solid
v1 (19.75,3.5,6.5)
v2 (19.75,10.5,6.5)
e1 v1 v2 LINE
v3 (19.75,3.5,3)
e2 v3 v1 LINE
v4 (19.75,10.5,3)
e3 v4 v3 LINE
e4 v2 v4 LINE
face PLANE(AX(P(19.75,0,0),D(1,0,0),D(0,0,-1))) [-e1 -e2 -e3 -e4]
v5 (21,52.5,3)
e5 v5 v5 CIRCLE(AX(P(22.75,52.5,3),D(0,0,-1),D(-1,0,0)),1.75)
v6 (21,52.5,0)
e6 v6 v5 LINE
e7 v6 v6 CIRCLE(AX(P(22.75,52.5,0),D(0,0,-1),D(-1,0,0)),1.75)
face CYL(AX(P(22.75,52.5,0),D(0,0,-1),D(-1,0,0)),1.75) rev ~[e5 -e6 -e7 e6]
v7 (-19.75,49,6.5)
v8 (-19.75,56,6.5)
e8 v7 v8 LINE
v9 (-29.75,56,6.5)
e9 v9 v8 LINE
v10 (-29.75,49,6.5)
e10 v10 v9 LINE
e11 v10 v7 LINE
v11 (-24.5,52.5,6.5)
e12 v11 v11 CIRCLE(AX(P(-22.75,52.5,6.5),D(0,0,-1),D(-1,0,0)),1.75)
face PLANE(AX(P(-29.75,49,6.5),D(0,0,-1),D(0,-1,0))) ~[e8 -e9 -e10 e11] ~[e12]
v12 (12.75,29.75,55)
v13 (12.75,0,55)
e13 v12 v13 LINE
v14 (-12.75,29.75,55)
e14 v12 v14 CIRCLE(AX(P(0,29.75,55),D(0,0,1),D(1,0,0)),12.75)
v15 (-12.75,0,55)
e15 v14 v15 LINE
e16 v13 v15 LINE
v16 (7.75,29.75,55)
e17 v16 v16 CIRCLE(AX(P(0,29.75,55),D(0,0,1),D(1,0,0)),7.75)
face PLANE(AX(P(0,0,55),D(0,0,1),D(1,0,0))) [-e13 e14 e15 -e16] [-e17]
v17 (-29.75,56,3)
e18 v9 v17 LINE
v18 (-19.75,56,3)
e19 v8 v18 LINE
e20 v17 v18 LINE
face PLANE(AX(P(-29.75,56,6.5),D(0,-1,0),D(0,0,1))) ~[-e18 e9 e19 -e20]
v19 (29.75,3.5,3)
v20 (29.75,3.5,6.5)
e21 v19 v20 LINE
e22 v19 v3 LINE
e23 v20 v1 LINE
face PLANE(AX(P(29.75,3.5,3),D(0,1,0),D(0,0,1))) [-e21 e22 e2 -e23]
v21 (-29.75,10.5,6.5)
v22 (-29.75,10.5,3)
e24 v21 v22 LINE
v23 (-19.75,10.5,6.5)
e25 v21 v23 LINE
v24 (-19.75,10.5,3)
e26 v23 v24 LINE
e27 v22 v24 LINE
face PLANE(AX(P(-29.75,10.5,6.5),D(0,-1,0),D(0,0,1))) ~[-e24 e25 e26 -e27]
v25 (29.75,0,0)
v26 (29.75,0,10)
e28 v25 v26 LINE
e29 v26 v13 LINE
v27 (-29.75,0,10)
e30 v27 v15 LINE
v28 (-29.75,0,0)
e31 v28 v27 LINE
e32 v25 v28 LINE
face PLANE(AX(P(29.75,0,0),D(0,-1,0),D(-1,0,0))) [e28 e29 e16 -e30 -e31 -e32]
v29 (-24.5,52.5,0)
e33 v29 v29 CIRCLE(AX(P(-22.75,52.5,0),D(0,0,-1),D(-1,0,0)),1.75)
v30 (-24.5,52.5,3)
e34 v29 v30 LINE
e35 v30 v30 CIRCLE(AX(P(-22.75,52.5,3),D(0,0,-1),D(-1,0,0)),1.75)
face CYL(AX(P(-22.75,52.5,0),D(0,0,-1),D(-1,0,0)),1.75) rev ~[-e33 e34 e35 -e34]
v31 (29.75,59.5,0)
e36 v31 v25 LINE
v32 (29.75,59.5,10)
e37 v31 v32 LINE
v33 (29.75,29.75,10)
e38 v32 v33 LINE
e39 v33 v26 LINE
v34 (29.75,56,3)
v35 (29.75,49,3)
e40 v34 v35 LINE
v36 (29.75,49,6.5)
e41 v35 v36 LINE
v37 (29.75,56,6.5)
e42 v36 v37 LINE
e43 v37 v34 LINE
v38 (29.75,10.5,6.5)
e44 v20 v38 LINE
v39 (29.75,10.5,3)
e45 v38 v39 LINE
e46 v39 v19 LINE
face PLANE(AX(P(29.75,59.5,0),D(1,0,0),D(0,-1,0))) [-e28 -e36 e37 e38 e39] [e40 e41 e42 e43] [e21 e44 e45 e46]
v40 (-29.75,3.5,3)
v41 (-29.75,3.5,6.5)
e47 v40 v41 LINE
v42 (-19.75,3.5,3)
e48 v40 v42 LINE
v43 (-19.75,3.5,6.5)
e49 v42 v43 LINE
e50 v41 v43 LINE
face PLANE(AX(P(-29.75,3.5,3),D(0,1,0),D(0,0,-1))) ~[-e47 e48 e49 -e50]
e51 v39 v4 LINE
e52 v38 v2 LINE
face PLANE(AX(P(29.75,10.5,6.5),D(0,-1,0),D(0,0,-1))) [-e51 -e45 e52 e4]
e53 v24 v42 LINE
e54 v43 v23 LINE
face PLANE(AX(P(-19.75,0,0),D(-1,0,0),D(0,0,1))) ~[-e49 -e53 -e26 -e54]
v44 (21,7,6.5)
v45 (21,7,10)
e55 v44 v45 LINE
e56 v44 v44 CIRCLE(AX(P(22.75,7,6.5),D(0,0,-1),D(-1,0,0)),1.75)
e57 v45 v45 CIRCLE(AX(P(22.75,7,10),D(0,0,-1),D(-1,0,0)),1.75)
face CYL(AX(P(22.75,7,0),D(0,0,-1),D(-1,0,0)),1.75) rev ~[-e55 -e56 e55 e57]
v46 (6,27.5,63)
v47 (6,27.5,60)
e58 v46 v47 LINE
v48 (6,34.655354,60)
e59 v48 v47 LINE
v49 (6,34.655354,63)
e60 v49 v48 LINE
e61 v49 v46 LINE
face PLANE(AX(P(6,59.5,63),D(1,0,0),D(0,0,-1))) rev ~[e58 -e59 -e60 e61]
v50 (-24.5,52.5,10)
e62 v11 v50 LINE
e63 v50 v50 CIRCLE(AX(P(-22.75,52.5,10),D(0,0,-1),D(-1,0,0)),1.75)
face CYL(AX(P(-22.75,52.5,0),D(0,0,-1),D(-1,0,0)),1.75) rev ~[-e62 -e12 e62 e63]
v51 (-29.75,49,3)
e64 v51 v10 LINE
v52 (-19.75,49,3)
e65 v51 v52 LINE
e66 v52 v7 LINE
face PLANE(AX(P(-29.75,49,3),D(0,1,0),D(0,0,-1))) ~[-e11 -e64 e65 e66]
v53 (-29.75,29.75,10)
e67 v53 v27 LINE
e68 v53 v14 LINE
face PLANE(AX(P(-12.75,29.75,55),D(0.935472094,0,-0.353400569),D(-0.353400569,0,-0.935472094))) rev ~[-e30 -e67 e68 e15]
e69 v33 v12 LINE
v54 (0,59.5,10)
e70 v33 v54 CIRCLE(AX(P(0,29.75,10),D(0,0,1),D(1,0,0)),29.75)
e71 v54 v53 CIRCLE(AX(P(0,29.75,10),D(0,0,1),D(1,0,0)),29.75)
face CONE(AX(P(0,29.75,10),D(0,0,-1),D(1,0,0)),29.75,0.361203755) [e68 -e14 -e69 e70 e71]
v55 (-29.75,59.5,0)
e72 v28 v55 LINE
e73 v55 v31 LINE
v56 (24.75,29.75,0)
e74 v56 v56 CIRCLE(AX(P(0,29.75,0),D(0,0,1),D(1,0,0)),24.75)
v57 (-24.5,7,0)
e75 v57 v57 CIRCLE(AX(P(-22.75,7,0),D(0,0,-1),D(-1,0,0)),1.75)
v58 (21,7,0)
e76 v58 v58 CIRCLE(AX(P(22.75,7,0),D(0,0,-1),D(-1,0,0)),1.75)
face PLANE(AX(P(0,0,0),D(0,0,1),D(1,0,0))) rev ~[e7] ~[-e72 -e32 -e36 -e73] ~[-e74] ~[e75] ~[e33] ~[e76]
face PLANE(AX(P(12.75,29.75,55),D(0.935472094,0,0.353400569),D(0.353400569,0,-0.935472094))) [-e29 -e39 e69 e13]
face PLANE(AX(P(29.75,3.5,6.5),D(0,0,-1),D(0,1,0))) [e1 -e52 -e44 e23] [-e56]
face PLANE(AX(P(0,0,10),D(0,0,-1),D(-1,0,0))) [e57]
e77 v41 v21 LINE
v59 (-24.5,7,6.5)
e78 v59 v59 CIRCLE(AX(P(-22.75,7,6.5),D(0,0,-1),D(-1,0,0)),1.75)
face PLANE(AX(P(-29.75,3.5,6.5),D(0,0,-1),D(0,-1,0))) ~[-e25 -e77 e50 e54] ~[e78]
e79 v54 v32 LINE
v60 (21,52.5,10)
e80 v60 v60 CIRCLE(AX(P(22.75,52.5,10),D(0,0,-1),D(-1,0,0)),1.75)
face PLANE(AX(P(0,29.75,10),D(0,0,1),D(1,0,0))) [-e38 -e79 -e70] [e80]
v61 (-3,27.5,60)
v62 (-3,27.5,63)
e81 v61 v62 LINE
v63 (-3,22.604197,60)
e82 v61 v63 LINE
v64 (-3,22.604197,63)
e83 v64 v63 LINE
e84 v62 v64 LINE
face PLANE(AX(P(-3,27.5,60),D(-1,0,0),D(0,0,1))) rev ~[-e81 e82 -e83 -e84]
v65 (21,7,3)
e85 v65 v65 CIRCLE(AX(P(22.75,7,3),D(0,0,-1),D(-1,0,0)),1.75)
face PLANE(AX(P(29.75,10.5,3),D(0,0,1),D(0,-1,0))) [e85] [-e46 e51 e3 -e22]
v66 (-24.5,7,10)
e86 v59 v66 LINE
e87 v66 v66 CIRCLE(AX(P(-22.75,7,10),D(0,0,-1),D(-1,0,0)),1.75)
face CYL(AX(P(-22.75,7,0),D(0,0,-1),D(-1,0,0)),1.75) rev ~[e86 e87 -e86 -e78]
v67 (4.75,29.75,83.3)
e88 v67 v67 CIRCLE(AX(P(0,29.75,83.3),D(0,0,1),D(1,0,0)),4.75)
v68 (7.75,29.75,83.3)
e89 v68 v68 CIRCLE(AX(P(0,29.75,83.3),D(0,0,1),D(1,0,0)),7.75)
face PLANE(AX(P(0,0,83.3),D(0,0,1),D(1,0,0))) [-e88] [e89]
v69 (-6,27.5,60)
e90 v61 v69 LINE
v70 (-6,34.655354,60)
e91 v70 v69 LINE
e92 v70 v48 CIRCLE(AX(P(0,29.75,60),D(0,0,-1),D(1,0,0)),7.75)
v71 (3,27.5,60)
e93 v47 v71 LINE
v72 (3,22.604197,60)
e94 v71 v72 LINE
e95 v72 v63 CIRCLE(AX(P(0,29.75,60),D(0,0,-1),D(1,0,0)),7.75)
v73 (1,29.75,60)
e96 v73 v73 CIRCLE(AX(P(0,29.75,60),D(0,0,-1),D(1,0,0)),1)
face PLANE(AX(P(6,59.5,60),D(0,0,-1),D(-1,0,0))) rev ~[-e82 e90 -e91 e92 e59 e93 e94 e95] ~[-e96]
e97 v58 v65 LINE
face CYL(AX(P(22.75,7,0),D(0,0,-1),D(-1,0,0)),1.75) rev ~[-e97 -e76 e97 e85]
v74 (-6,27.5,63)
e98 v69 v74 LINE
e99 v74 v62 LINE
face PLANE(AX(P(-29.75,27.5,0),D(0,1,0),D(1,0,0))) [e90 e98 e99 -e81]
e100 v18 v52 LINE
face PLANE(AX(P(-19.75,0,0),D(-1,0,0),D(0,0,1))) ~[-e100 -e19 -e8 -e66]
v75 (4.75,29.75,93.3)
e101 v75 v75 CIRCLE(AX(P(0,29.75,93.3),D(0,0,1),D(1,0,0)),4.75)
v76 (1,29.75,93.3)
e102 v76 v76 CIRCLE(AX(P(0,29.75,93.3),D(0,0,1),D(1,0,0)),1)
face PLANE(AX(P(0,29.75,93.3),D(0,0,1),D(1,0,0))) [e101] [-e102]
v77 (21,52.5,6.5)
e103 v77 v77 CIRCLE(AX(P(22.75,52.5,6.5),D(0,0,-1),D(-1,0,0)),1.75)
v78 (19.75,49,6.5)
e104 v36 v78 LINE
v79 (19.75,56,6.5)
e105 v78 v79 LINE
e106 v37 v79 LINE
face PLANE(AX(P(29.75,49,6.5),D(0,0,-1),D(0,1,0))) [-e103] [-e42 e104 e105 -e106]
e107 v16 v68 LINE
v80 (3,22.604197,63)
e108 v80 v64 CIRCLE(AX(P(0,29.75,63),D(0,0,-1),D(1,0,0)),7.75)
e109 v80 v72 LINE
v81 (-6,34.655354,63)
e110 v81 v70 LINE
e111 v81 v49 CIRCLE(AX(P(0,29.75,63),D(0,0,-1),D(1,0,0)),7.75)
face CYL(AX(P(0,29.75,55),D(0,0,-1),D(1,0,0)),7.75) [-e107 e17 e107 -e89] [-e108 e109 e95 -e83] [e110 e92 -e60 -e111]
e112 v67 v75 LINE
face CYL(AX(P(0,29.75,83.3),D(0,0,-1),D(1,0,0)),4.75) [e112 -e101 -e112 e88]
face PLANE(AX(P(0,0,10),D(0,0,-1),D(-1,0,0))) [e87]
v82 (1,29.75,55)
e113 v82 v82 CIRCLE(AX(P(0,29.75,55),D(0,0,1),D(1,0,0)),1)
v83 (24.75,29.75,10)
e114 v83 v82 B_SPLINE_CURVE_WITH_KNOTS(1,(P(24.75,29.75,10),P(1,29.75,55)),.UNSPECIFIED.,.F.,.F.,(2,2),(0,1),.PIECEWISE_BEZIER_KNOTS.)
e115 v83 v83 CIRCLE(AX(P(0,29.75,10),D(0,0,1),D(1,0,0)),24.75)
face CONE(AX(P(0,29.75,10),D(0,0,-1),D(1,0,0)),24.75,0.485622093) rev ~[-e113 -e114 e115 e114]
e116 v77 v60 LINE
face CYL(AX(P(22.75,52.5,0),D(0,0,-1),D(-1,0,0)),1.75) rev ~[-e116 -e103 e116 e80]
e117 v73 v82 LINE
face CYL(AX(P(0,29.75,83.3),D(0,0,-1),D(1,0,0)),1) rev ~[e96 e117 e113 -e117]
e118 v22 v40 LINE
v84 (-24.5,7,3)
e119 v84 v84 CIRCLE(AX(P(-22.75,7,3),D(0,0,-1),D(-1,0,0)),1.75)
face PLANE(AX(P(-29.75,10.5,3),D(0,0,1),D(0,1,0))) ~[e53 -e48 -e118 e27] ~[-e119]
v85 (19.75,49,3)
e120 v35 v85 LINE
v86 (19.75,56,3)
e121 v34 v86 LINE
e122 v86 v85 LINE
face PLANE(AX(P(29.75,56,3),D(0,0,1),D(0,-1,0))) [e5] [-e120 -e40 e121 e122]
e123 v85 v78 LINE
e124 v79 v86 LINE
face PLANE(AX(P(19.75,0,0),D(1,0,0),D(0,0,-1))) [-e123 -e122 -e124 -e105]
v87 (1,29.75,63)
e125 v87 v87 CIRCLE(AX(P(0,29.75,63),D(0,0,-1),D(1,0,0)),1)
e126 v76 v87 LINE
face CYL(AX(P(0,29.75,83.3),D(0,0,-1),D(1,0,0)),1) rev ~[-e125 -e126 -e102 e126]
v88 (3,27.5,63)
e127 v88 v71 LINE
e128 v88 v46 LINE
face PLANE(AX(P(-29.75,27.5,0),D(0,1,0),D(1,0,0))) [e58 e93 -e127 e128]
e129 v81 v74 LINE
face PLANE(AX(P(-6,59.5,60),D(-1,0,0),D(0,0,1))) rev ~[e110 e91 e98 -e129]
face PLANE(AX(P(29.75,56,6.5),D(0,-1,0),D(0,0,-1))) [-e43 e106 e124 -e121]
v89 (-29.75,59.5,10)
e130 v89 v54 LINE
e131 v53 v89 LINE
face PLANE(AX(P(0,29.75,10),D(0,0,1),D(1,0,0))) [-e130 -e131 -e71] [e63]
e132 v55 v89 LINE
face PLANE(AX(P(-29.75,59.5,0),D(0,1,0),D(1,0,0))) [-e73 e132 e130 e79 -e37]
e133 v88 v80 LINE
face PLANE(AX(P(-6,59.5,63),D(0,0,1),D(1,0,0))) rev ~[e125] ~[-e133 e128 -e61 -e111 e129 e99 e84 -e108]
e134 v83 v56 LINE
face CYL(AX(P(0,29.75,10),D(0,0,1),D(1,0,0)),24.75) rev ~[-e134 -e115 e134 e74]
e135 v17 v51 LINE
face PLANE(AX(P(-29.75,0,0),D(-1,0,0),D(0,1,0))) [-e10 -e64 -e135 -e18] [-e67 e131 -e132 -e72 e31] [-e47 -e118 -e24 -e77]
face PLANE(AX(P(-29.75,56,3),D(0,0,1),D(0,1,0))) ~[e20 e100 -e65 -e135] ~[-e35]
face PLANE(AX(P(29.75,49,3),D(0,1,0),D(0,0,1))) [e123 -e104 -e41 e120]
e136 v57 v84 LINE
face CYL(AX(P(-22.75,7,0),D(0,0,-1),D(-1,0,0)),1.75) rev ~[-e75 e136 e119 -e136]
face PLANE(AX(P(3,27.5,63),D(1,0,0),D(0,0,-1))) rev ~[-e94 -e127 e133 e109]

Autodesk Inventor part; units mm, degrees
ref_plane "YZ Plane" through (0, 0, 0) normal (1, 0, 0) x (0, 1, 0)
ref_plane "XZ Plane" through (0, 0, 0) normal (0, 1, 0) x (-1, 0, 0)
sketch "Sketch2" plane through (0, 0, 0) normal (0, 0, 1) x (1, 0, 0)
  line L0 (-29.75, 59.5) -> (29.75, 59.5)
  line L1 (29.75, 59.5) -> (29.75, 0)
  line L2 (29.75, 0) -> (-29.75, 0)
  line L3 (-29.75, 0) -> (-29.75, 59.5)
  point P0 (0, 0)
  point P1 (0, 0)
  dimension "d0" = 59.5
extrude "Extrusion1" add sketch "Sketch2" along normal blind 55
sketch "Sketch3" plane through (0, 0, 55) normal (0, 0, 1) x (1, 0, 0)
  circle A0 centre (0, 29.75) radius 1
  circle A1 centre (0, 29.75) radius 7.75
  line L0 (0, 0) -> (0, 59.5) construction
  line L1 (29.75, 59.5) -> (-29.75, 59.5) construction
  line L2 (29.75, 0) -> (29.75, 59.5) construction
  line L3 (29.75, 29.75) -> (-29.75, 29.75) construction
  line L4 (-29.75, 59.5) -> (-29.75, 0) construction
  line L5 (-29.75, 0) -> (29.75, 0) projected
  dimension "d3" = 15.5
  dimension "d5" = 2
  dimension "d47" = 22
extrude "Extrusion2" add sketch "Sketch3" along normal blind 28.3
sketch "Sketch4" plane through (0, 29.75, 83.3) normal (0, 0, 1) x (1, 0, 0)
  circle A0 centre (0, 0) radius 1
  circle A1 centre (0, 0) radius 4.75
  circle A2 centre (0, 0) radius 1 projected
  point P0 (0, -29.75)
  dimension "d8" = 9.5
extrude "Extrusion3" add sketch "Sketch4" along normal blind 10
sketch "Sketch10" plane through (0, 0, 0) normal (0, 0, -1) x (-1, 0, 0)
  circle A0 centre (-22.75, 52.5) radius 1.75
  circle A1 centre (-22.75, 7) radius 1.75
  circle A2 centre (22.75, 52.5) radius 1.75
  circle A3 centre (22.75, 7) radius 1.75
  line L0 (-29.75, 59.5) -> (-29.75, 0) projected
  line L1 (29.75, 59.5) -> (-29.75, 59.5) projected
  line L2 (-29.75, 29.75) -> (29.75, 29.75) construction
  line L3 (29.75, 0) -> (29.75, 59.5) construction
  line L4 (0, 59.5) -> (0, 0) construction
  dimension "d29" = 7
  dimension "d30" = 7
  dimension "d33" = 3.5
extrude "Extrusion5" cut sketch "Sketch10" against normal blind 10
sketch "Sketch9" plane through (29.75, 0, 0) normal (1, 0, 0) x (0, 0, -1)
  line L0 (-6.5, 56) -> (-3, 56)
  line L1 (-3, 56) -> (-3, 49)
  line L2 (-3, 49) -> (-6.5, 49)
  line L3 (-6.5, 49) -> (-6.5, 56)
  line L4 (-6.5, 10.5) -> (-3, 10.5)
  line L5 (-3, 10.5) -> (-3, 3.5)
  line L6 (-3, 3.5) -> (-6.5, 3.5)
  line L7 (-6.5, 3.5) -> (-6.5, 10.5)
  line L8 (0, 59.5) -> (-55, 59.5) projected
  line L9 (-55, 0) -> (-55, 59.5) construction
  line L10 (-55, 29.75) -> (0, 29.75) construction
  line L11 (0, 0) -> (0, 59.5) construction
  line L12 (0, 54.25) -> (0, 50.75) projected
  line L13 (0, 52.5) -> (-10, 52.5) construction
  line L14 (-10, 54.25) -> (-10, 50.75) projected
  dimension "d24" = 7
  dimension "d25" = 3.5
  dimension "d26" = 3
extrude "Extrusion4" cut sketch "Sketch9" against normal blind 10
mirror "Mirror1" about plane through (0, 0, 0) normal (1, 0, 0) of "Extrusion4"
ref_plane "Work Plane1" through (0, 0, 10) normal (0, 0, 1) x (1, 0, 0)
sketch "Sketch11" plane through (0, 0, 10) normal (0, 0, 1) x (1, 0, 0)
  circle A0 centre (0, 29.75) radius 24.75
  circle A1 centre (0, 29.75) radius 1 projected
  line L0 (-29.75, 59.5) -> (29.75, 59.5) projected
  point P0 (0, 0)
  dimension "d49" = 5
extrude "Extrusion6" cut sketch "Sketch11" against normal through all contours A0 | A1
loft "Loft2" cut section 1 edges at (-24.75, 29.75, 10) section 2 edges at (-1, 29.75, 55)
sketch "Sketch7" plane through (-29.75, 59.5, 0) normal (0, 1, 0) x (1, 0, 0)
  line L0 (35.75, -60) -> (23.75, -60)
  line L1 (23.75, -60) -> (23.75, -63)
  line L2 (23.75, -63) -> (35.75, -63)
  line L3 (35.75, -63) -> (35.75, -60)
  line L4 (29.75, -60) -> (29.75, -63) construction
  line L5 (26.5, -55) -> (28.5, -55) construction
  line L6 (29.75, -55) -> (29.75, -83.3) construction
  line L7 (59.5, -55) -> (0, -55) construction
  line L8 (22, -83.3) -> (37.5, -83.3) projected
  point P0 (29.75, 0)
  dimension "d16" = 3
  dimension "d17" = 12
  dimension "d18" = 5
extrude "Extrusion7" cut sketch "Sketch7" against normal blind 32
sketch "Sketch12" plane through (-29.75, 27.5, 0) normal (0, 1, 0) x (1, 0, 0)
  line L0 (32.75, -60) -> (26.75, -60)
  line L1 (26.75, -60) -> (26.75, -63)
  line L2 (26.75, -63) -> (32.75, -63)
  line L3 (32.75, -63) -> (32.75, -60)
  line L4 (35.75, -60) -> (35.75, -63) projected
  line L5 (35.75, -63) -> (23.75, -63) projected
  line L6 (28.75, -60) -> (30.75, -60) construction
  line L7 (29.75, -60) -> (29.75, -63) construction
  line L8 (30.75, -63) -> (28.75, -63) construction
  point P0 (29.75, 0)
  point P1 (22.3338, -63)
  dimension "d44" = 6
extrude "Extrusion8" cut sketch "Sketch12" against normal through all
sketch "Sketch14" plane through (0, 0, 0) normal (1, 0, 0) x (0, 1, 0)
  line L0 (59.5, 10) -> (42.5, 55)
  line L1 (42.5, 55) -> (79.5, 55)
  line L2 (79.5, 10) -> (79.5, 55)
  line L3 (59.5, 55) -> (0, 55) projected
  line L4 (37.5, 55) -> (37.5, 83.3) projected
  line L5 (59.5, 0) -> (59.5, 55) projected
  line L6 (5, 10) -> (54.5, 10) projected
  line L7 (79.5, 10) -> (59.5, 10)
  line L8 (59.5, 0) -> (59.5, 55) projected
  line L9 (54.25, 10) -> (50.75, 10) projected
  line L10 (29.75, -18.66) -> (29.75, 111.96) projected
  point P0 (0, 0)
  point P1 (55, 37.5)
  point P2 (55, 37.5)
  dimension "d54" = 5
  dimension "d55" = 20
revolve "Revolution1" cut sketch "Sketch14" angle 180 mid plane about axis through (0, 29.75, 55) along (0, 0, 1)
sketch "Sketch15" plane through (12.75, 29.75, 55) normal (0, 1, 0) x (1, 0, 0)
  line L0 (-42.5, 0) -> (-25.5, 0)
  line L1 (-25.5, 0) -> (0, 0)
  line L2 (-42.5, 0) -> (17, 0) projected
  line L3 (0, 0) -> (17, 0)
  line L4 (17, 0) -> (17, 45)
  line L5 (17, 55) -> (17, 0) projected
  line L6 (0, 0) -> (17, 45)
  line L7 (0, 0) -> (17, 45) projected
  line L8 (17, 45) -> (-25.5, 0)
  line L9 (-25.5, 0) -> (-42.5, 45)
  line L10 (-42.5, 45) -> (-25.5, 0) projected
  line L11 (-42.5, 0) -> (-42.5, 45)
  line L12 (-42.5, 55) -> (-42.5, 0) projected
  point P0 (-12.75, 55)
extrude "Extrusion10" cut sketch "Sketch15" against normal through all contours L11 L9 L0 | L6 L4 L2
properties part number "Power_Meter_Adapter_Part1"
